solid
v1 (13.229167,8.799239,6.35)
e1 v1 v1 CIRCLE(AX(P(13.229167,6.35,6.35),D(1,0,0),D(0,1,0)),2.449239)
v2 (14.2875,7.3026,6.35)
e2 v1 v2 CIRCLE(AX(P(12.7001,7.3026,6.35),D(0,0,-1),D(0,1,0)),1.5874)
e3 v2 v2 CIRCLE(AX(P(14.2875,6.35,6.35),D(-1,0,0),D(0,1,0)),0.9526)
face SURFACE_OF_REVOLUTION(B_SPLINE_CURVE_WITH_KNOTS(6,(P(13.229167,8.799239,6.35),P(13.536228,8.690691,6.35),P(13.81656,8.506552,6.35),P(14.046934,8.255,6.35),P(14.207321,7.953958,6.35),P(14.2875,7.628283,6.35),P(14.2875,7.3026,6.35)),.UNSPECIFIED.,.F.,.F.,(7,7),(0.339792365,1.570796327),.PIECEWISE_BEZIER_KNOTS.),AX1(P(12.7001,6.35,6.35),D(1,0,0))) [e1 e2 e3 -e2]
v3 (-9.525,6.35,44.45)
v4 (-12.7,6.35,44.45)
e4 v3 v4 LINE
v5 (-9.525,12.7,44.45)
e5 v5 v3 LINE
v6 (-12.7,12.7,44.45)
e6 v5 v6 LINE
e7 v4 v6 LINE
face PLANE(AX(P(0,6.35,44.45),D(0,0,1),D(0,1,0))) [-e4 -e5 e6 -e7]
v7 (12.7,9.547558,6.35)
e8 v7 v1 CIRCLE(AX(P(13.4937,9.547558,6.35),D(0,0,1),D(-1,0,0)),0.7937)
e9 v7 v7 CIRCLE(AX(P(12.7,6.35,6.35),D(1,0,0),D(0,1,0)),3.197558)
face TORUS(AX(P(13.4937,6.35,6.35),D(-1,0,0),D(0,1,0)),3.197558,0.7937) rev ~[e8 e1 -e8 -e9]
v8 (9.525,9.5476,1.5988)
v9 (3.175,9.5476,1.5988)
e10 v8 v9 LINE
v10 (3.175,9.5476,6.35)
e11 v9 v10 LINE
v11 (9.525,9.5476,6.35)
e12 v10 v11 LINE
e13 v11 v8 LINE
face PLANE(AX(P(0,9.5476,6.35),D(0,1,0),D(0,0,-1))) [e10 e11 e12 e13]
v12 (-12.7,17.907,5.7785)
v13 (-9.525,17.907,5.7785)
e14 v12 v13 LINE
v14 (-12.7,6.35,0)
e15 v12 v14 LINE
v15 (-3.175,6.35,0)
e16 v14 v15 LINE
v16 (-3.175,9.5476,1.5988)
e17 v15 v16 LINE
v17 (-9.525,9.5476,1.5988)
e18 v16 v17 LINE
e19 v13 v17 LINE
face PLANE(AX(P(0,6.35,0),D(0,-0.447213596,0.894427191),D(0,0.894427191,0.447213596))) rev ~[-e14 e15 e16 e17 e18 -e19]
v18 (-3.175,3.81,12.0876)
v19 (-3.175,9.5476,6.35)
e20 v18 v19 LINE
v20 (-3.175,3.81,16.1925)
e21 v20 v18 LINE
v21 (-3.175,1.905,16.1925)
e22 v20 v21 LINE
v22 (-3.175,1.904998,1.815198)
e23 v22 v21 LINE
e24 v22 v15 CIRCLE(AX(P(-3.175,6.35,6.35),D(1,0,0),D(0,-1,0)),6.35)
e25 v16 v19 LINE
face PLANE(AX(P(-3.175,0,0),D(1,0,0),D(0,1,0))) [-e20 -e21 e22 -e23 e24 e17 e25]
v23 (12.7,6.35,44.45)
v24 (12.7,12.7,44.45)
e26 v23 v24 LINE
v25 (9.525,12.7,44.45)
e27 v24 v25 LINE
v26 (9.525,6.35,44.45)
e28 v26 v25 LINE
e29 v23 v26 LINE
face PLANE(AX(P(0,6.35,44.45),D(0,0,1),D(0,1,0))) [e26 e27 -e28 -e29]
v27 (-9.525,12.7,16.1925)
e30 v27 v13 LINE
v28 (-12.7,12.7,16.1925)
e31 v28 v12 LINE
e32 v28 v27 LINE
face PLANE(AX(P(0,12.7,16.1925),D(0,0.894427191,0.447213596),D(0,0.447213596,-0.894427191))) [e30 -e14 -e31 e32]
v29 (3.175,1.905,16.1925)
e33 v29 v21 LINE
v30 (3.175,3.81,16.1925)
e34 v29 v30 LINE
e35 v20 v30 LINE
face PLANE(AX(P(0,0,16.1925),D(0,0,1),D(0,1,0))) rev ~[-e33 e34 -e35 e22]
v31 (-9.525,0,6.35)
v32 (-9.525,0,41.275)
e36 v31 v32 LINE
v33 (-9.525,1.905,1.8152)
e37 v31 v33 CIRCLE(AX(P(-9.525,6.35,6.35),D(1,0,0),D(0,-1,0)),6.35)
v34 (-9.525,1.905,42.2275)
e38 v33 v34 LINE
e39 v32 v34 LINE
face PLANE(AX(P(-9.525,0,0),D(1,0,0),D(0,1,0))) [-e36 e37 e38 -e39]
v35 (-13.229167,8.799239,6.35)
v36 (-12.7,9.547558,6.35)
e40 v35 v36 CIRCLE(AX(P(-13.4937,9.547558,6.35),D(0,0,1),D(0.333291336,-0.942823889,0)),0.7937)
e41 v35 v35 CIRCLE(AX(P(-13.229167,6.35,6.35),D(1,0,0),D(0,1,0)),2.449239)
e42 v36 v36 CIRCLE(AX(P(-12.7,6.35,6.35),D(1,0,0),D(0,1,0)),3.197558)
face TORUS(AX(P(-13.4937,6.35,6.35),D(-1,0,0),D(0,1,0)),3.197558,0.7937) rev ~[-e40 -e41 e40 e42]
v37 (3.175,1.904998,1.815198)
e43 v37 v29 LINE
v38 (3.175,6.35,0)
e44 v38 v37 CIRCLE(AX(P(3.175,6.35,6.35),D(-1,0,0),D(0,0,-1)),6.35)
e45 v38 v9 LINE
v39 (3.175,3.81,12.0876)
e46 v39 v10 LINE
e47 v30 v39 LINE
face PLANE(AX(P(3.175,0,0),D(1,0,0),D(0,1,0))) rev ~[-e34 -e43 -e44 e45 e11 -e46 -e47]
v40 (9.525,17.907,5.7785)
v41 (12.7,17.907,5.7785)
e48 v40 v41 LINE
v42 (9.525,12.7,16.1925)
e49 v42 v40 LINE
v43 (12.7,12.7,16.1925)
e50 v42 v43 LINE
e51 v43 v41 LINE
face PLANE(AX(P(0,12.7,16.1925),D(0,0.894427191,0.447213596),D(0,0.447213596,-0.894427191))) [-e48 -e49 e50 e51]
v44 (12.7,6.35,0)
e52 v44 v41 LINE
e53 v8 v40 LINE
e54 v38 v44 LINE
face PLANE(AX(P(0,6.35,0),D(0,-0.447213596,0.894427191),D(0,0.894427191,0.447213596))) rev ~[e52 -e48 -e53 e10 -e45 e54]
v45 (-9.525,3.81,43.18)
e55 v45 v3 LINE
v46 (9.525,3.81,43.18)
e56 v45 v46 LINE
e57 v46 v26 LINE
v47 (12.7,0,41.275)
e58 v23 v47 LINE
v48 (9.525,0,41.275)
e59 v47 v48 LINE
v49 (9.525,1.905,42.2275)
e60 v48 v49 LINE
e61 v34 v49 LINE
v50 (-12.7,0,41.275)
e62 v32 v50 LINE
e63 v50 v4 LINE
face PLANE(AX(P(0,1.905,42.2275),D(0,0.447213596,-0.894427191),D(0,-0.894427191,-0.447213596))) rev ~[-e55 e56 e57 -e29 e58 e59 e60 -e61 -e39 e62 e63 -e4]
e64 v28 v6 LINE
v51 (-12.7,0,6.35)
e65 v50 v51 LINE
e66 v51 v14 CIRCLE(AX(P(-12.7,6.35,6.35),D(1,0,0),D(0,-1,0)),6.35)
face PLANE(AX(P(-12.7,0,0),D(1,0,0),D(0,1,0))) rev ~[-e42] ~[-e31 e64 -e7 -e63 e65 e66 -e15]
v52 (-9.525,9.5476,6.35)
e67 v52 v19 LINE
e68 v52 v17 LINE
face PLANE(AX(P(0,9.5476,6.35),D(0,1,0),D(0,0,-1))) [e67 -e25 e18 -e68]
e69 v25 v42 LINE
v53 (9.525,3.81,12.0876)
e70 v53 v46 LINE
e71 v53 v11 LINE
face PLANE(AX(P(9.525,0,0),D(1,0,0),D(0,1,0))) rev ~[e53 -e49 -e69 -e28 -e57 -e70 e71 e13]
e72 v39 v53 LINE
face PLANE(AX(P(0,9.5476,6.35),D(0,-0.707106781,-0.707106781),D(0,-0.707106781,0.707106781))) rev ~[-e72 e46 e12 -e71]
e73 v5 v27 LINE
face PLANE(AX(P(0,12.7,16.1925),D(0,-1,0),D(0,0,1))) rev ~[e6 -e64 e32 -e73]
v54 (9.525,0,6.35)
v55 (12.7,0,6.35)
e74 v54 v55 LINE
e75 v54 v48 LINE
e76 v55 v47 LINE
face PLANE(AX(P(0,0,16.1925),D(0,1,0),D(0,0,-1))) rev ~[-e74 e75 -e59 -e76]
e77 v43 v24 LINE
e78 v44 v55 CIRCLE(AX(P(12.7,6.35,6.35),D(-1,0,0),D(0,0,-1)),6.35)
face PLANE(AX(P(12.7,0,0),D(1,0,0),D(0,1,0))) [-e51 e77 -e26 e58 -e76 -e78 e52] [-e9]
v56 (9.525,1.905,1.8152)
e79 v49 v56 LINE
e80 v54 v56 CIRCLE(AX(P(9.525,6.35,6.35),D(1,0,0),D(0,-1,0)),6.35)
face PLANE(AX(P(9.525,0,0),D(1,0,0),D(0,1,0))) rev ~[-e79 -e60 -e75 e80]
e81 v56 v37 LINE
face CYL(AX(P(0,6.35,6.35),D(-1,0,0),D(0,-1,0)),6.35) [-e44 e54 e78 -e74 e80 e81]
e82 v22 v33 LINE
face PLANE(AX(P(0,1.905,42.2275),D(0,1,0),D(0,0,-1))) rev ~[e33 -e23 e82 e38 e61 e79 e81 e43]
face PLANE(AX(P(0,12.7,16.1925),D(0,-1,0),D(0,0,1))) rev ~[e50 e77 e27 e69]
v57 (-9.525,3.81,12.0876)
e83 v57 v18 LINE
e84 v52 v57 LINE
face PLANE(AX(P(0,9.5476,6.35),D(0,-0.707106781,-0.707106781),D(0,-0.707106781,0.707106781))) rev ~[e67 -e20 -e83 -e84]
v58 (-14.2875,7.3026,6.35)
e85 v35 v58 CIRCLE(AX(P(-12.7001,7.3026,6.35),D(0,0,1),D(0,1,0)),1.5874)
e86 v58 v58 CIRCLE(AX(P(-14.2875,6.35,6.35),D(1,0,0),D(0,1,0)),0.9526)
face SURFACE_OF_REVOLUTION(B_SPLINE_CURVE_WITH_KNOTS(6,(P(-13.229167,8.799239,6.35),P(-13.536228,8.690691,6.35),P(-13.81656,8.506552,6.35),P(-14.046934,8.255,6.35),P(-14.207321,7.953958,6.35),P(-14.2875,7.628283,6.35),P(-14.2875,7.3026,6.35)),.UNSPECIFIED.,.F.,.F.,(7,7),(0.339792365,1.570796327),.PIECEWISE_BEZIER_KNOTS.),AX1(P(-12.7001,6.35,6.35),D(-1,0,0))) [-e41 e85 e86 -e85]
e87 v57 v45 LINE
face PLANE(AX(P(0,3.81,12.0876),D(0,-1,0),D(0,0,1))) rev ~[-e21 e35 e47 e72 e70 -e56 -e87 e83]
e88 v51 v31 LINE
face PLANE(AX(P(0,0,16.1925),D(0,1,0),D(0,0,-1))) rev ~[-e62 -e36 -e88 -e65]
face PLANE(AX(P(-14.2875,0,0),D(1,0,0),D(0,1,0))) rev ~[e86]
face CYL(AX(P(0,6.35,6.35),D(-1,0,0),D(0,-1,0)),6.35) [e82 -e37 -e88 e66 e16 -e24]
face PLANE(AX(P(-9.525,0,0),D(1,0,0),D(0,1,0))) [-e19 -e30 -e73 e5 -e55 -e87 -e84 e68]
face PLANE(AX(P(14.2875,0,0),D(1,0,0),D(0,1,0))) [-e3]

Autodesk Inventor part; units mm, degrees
ref_plane "YZ Plane" through (0, 0, 0) normal (1, 0, 0) x (0, 1, 0)
ref_plane "XZ Plane" through (0, 0, 0) normal (0, 1, 0) x (-1, 0, 0)
ref_plane "XY Plane" through (0, 0, 0) normal (0, 0, 1) x (1, 0, 0)
sketch "Sketch2" plane through (0, 0, 0) normal (1, 0, 0) x (0, 1, 0)
  line L0 (0, 0) -> (12.7, 0) construction
  line L1 (12.7, 0) -> (12.7, 44.45) construction
  line L2 (12.7, 44.45) -> (0, 44.45) construction
  line L3 (0, 44.45) -> (0, 0) construction
  arc A0 (0, 6.35) -> (6.35, 0) centre (6.35, 6.35) ccw
  line L4 (6.35, 0) -> (6.35, 44.45) construction
  line L5 (6.35, 44.45) -> (0, 41.275)
  line L6 (0, 41.275) -> (0, 6.35)
  line L7 (6.35, 44.45) -> (6.35, 42.545)
  line L8 (6.35, 42.545) -> (1.905, 40.3225)
  line L9 (1.905, 40.3225) -> (1.905, 9.525)
  line L10 (6.35, 44.45) -> (12.7, 44.45)
  line L11 (6.35, 0) -> (12.7, 3.175)
  line L12 (12.7, 3.175) -> (12.7, 44.45)
  line L13 (6.35, 6.35) -> (6.35, 0)
  line L14 (6.35, 6.35) -> (1.905, 9.525)
  circle A1 centre (6.35, 6.35) radius 2.54
  line L15 (0, 16.1925) -> (12.7, 16.1925)
  line L16 (3.81, 0.5301) -> (3.81, 43.18)
  line L17 (1.905, 9.525) -> (1.905, 1.8152)
  line L18 (1.905, 40.3225) -> (1.905, 42.2275)
  line L19 (12.7, 16.1925) -> (17.907, 5.7785)
  line L20 (12.7, 3.175) -> (17.907, 5.7785)
  dimension "d2" = 12.7
  dimension "d3" = 44.45
  dimension "d4" = 12.7
  dimension "d5" = 3.175
  dimension "d6" = 1.905
  dimension "d7" = 1.905
  dimension "d8" = 3.175
  dimension "d9" = 3.175
  dimension "d10" = 5.08
  dimension "d11" = 16.1925
  dimension "d22" = 1.905
extrude "Extrusion1" add sketch "Sketch2" along normal mid plane 28.575 contours A1 L14 L13 | L13 L14 A1
extrude "Extrusion2" add sketch "Sketch2" along normal mid plane 25.4
extrude "Extrusion4" cut sketch "Sketch2" along normal mid plane 6.35 contours L6 L15 L9 L17 A0 | L17 L14 L16 A0 | L16 A1 L13 A0 | L9 L15 L16 L14 | L13 A1 L14 L16 L15 L12 L11 | L16 L14 A1 | A1 L14 L13 | L13 L14 A1
fillet "Fillet1" radius 1.5875 2 edges at (-14.2875, 3.81, 6.35) (14.2875, 3.81, 6.35)
fillet "Fillet2" radius 0.7937 4 edges at (-12.7, 3.81, 6.35) (-12.7001, 3.81, 6.35) (12.7001, 3.81, 6.35) (12.7, 3.81, 6.35)
sketch "Sketch3" plane through (0, 0, 0) normal (1, 0, 0) x (0, 1, 0)
  line L0 (12.7, 44.45) -> (12.7, 16.1925) projected
  line L1 (17.907, 5.7785) -> (6.35, 0) projected
  arc A0 (0, 6.35) -> (6.35, 0) centre (6.35, 6.35) ccw projected
  line L2 (0, 6.35) -> (0, 41.275) projected
  line L3 (0, 41.275) -> (6.35, 44.45) projected
  line L4 (6.35, 44.45) -> (12.7, 44.45) projected
  circle A1 centre (6.35, 6.35) radius 3.1976 projected
  circle A2 centre (6.35, 6.35) radius 3.1976 projected
  line L5 (3.81, 0.5301) -> (3.81, 43.18) projected
  line L6 (1.905, 40.3225) -> (1.905, 9.525) projected
  line L7 (1.905, 42.2275) -> (1.905, 1.8152)
  line L8 (0, 0) -> (1.905, 0)
  line L9 (1.905, 0) -> (1.905, 42.2275)
  line L10 (1.905, 42.2275) -> (0, 42.2275)
  line L11 (0, 42.2275) -> (0, 0)
  circle A3 centre (6.35, 6.35) radius 3.1976
  line L12 (9.5476, 44.45) -> (9.5476, 1.5988)
  line L13 (12.7, 44.45) -> (9.5476, 44.45)
  line L14 (9.5476, 44.45) -> (9.5476, 0)
  line L15 (9.5476, 0) -> (12.7, 0)
  line L16 (12.7, 0) -> (12.7, 44.45)
  line L17 (6.3337, 9.5475) -> (1.905, 9.525)
  circle A4 centre (6.35, 6.35) radius 3.1976
  line L18 (9.5476, 6.35) -> (9.5476, 0)
  line L19 (9.5476, 0) -> (1.905, 0)
  line L20 (9.5476, 7.1442) -> (9.5476, 44.45)
  line L21 (6.35, 44.45) -> (3.81, 43.18)
  line L22 (3.81, 12.0876) -> (3.81, 43.18)
  line L23 (1.905, 42.2275) -> (6.35, 44.45)
  line L24 (6.35, 44.45) -> (9.5476, 44.45)
  line L25 (9.5476, 44.45) -> (9.5476, 6.35)
  line L26 (9.5476, 6.35) -> (1.905, 13.9926)
  line L27 (12.7, 16.1925) -> (17.907, 5.7785) projected
  dimension "d25" = 1.905
extrude "Extrusion6" cut sketch "Sketch3" along normal mid plane 19.05 contours L0 L16 L1 L12 L4 | L27 L1 L16 | L12 A1 L26 L5 L3 L4 | L26 A1 | L7 L6 A0 L2 L3
equation "\"d7\" = d6"
equation "\"d22\" = d7"
properties part number "LegV1"
